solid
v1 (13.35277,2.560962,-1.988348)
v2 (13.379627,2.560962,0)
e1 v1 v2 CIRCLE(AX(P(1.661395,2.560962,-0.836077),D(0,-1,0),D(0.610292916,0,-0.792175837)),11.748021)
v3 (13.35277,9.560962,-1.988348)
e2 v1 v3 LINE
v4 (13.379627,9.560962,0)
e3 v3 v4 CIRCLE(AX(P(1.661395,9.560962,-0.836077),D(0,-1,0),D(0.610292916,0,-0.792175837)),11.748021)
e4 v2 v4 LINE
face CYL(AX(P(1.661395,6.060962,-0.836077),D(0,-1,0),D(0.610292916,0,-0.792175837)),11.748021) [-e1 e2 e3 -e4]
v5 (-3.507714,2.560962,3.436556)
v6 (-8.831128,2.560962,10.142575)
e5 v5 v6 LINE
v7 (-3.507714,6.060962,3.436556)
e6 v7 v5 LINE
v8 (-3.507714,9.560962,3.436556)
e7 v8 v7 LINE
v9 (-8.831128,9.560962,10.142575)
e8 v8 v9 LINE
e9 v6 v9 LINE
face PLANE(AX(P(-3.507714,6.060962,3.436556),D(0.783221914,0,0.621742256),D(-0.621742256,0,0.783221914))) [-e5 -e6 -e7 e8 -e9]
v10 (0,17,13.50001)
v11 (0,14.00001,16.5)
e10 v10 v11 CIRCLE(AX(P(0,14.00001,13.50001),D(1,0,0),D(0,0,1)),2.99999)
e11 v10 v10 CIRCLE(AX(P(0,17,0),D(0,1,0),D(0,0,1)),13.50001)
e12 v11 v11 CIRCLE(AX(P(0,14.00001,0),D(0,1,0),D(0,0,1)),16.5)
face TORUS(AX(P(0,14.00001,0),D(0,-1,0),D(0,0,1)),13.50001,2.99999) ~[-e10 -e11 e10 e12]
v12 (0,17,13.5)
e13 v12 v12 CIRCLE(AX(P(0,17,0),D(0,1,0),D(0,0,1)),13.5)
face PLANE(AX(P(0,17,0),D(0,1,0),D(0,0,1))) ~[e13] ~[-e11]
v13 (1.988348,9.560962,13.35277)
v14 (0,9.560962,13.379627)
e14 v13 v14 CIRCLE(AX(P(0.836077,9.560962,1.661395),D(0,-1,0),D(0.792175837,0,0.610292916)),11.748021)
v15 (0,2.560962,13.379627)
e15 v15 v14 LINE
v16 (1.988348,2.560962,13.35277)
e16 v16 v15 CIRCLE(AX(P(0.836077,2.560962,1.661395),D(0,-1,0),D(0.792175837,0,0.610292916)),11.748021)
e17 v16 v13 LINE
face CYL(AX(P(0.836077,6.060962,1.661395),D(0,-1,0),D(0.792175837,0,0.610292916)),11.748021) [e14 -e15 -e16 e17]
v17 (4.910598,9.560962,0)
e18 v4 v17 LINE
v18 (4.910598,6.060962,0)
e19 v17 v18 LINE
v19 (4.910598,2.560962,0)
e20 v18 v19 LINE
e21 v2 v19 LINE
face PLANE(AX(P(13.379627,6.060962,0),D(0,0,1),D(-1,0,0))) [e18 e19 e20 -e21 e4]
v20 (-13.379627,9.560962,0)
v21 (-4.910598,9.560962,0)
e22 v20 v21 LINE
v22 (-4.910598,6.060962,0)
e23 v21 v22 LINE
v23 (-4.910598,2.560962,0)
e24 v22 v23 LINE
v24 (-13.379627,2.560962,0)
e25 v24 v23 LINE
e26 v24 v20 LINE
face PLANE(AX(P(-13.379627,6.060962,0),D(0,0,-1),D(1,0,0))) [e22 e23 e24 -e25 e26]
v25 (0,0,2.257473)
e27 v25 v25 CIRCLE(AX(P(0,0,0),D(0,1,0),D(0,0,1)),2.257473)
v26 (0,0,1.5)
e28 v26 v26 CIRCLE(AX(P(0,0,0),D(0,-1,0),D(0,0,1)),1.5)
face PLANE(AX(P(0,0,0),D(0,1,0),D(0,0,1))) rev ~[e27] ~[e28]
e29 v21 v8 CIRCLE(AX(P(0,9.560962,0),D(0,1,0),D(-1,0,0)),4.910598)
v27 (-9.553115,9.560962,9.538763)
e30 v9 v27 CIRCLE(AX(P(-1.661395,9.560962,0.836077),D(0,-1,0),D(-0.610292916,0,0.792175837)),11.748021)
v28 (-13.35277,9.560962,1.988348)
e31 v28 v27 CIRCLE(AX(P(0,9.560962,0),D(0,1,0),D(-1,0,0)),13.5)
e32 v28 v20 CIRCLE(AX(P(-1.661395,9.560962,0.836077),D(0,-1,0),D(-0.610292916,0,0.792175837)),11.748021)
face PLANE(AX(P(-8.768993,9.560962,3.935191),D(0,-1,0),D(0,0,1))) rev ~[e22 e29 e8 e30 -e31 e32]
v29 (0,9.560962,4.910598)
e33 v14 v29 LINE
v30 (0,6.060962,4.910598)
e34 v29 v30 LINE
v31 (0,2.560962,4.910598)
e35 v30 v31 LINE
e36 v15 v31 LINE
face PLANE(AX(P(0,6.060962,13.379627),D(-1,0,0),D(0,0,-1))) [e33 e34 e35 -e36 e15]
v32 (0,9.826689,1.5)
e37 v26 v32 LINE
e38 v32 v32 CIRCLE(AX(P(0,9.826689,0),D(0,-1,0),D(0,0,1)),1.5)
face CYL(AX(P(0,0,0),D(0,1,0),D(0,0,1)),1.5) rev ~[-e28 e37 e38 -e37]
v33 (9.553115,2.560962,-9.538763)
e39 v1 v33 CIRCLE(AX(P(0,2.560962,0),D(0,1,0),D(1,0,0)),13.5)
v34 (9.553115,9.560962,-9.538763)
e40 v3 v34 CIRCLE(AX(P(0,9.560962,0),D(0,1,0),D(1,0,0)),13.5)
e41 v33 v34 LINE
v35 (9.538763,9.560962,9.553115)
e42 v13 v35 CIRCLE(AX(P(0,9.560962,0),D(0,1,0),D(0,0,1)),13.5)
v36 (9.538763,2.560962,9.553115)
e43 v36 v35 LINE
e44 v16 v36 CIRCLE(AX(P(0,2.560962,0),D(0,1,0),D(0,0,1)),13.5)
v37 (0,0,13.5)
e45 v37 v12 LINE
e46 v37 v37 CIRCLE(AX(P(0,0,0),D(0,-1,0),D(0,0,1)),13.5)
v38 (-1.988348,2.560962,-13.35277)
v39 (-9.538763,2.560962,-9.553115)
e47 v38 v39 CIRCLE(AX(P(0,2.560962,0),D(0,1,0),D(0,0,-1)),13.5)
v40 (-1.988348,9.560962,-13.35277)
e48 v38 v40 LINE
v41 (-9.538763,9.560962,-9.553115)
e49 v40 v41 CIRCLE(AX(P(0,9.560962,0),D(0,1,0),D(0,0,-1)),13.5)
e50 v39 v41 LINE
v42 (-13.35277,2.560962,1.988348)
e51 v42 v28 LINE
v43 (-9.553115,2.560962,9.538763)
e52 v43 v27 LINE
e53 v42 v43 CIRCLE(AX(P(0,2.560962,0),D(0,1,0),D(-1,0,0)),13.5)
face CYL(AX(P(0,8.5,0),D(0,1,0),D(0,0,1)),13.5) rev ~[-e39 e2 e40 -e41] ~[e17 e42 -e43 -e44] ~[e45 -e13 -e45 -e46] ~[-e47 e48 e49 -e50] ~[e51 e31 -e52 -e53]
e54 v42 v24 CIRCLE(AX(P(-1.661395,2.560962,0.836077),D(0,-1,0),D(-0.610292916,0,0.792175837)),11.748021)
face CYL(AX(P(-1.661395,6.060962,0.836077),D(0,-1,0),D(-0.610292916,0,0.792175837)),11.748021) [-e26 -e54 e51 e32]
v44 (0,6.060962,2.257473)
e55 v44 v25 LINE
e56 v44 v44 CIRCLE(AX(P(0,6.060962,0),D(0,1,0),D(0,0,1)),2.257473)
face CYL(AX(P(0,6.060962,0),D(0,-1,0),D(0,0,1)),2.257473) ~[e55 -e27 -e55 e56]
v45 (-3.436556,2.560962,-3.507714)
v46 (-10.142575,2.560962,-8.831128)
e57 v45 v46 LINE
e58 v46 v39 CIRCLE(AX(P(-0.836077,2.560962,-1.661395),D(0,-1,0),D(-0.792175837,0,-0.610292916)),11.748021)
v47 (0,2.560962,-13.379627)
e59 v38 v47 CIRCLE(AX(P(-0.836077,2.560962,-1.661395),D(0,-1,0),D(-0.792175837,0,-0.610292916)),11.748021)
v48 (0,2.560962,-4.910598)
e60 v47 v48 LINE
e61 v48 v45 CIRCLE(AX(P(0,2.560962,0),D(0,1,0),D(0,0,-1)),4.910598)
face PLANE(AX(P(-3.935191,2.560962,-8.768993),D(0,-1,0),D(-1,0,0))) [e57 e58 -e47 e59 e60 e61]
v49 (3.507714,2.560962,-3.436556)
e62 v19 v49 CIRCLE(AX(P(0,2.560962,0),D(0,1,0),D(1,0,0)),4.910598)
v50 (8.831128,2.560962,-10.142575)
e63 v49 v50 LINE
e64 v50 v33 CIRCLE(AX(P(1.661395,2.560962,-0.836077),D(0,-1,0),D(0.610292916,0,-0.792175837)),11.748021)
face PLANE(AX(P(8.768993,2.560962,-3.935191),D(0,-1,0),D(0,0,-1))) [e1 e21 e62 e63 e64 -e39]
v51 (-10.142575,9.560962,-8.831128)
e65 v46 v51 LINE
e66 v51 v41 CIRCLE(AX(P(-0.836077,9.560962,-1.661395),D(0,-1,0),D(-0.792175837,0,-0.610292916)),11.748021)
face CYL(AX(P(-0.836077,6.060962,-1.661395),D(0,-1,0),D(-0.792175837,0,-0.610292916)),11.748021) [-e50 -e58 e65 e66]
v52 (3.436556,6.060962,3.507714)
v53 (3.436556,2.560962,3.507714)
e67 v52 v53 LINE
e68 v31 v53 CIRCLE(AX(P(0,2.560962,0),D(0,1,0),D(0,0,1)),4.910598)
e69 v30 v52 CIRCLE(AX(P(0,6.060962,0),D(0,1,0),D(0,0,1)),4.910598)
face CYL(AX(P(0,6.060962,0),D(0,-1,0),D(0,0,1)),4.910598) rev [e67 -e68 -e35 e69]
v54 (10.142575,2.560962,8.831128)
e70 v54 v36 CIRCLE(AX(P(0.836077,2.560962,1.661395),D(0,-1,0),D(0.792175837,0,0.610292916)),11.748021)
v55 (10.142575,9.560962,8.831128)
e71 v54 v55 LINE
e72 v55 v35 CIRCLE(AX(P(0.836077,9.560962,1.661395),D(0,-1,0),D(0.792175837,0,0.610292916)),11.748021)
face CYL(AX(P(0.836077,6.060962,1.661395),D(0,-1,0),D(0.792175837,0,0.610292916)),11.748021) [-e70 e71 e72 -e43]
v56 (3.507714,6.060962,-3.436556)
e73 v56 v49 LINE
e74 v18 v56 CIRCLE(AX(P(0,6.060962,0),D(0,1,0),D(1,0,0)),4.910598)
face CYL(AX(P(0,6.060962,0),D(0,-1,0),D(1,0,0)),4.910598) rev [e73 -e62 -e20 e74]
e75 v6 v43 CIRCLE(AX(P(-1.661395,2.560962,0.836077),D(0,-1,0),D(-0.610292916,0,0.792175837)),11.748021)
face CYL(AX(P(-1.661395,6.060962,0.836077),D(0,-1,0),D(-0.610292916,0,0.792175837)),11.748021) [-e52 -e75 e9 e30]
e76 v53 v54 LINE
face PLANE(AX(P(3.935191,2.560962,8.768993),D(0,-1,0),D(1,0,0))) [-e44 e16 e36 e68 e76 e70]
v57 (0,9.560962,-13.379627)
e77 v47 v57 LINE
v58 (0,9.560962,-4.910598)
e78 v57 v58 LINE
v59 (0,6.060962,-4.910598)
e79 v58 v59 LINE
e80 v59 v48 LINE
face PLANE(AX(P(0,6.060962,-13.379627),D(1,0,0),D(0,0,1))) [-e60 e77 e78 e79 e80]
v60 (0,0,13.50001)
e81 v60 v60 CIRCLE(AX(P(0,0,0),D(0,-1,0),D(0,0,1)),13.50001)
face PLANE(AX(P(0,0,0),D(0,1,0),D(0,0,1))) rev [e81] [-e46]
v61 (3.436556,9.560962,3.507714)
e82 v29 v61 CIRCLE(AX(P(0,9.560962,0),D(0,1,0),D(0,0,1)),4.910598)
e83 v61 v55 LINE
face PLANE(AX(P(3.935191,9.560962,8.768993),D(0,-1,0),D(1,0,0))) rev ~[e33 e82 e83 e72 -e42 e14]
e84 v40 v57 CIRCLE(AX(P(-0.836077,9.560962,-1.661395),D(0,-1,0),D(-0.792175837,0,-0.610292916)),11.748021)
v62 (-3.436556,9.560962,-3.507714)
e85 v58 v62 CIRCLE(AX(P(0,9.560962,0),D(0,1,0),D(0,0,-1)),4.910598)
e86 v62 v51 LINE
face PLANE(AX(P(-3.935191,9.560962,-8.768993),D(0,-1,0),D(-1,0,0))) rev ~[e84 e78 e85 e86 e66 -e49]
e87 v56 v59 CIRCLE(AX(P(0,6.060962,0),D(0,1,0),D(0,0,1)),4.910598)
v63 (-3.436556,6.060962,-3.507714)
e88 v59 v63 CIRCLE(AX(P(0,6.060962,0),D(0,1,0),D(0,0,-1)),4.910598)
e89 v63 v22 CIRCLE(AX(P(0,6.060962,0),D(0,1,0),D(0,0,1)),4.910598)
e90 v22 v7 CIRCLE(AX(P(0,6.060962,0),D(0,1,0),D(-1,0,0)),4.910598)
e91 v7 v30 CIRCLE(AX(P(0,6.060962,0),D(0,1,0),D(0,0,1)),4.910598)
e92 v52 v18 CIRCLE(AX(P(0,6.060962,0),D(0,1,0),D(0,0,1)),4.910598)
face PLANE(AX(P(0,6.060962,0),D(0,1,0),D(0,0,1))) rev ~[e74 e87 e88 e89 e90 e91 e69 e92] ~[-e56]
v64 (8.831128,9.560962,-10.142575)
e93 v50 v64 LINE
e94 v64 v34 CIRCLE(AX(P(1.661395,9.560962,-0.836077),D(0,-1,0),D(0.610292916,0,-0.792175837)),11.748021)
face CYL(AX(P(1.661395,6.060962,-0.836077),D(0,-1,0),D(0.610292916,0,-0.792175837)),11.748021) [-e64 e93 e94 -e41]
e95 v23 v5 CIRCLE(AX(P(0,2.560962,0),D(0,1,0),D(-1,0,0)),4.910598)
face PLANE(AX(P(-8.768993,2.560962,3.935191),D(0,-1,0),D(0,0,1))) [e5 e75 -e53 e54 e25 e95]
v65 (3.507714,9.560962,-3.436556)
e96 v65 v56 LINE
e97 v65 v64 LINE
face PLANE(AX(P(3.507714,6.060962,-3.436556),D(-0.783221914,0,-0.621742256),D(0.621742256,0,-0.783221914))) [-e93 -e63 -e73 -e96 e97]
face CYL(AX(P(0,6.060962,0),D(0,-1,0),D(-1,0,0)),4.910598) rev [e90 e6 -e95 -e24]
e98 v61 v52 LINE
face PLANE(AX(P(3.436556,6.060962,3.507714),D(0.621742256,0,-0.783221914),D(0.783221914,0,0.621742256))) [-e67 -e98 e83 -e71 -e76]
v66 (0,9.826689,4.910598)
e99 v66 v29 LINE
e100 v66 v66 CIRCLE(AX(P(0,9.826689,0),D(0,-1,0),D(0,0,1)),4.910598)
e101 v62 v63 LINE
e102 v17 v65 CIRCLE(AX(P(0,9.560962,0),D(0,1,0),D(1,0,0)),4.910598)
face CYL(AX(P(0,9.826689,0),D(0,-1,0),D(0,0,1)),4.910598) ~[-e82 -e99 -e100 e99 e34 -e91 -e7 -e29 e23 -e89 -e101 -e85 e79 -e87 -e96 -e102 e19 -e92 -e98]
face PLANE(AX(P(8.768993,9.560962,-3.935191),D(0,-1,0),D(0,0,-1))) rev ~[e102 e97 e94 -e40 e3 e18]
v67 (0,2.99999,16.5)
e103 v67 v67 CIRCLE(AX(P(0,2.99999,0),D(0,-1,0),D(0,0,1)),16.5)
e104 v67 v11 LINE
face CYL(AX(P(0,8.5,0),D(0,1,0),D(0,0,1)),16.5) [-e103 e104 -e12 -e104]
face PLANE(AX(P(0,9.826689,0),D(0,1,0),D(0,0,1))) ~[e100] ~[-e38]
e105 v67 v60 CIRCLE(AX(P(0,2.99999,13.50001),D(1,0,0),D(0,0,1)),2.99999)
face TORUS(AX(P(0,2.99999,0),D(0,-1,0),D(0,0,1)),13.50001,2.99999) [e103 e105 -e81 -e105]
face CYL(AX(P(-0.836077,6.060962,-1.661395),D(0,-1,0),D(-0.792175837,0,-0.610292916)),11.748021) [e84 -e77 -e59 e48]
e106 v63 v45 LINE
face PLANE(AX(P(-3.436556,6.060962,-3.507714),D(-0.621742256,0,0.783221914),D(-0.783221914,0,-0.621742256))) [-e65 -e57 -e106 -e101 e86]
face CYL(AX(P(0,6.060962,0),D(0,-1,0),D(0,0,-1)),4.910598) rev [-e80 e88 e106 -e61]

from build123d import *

# Parameters (mm, degrees)
F0_W     = 17
F0_H     = 3
F3_DEPTH = 3.5
F4_COUNT = 4
F5_R     = 2.99999


# Not quite as in the source:
# - a fillet or chamfer is up to 0.001 mm smaller than in the source, because OpenCascade refuses the exact size


with BuildPart() as f1:
    # F0 (on Right) → F1 (revolve)
    with BuildSketch(Plane.YZ):
        with Locations((8.5, 15)):
            Rectangle(F0_W, F0_H)
    revolve(axis=Axis((0, 4.8521989956, 0), (0, 1, 0)))



with BuildPart() as f1b:
    # F0 (on Right) → F1, piece 2 (revolve)
    with BuildSketch(Plane.YZ):
        Polygon((0, 2.2574728355), (0, 1.5), (9.8266890272, 1.5), (9.8266890272, 4.9105980434), (6.0609620996, 4.9105980434), (6.0609620996, 2.2574728355), align=None)
    revolve(axis=Axis((0, 4.8521989956, 0), (0, 1, 0)))


with BuildPart() as f1_1:
    add(f1.part)

    add(f1b.part)  # F3 merges F1b
    # F2 (on face) → F3 (join, symmetric)
    with BuildSketch(Plane.XZ.offset(-6.0609620996)):
        with BuildLine():
            Line((0, 13.3796269074), (0, 4.9105980434))
            ThreePointArc((0, 4.9105980434), (1.8559366755, 4.5463691227), (3.4365562486, 3.5077135421))
            Line((3.4365562486, 3.5077135421), (10.1425750181, 8.8311284781))
            ThreePointArc((10.1425750181, 8.8311284781), (5.6432817311, 12.3808523131), (0, 13.3796269074))
        make_face()
    extrude(amount=F3_DEPTH, both=True)

    # F4: F1 ×4 about axis
    f4_axis = Axis((0, 9.8266890272, 0), (0, 1, 0))


with BuildPart() as f1_2:
    add(f1_1.part)
    for i in range(1, F4_COUNT):
        add(f1_1.part.rotate(f4_axis, i * 360 / F4_COUNT))

    # F5 (radius 3 in the source; OpenCascade refuses exactly that, so slightly less here)
    f5_edges = [f1_2.edges().sort_by_distance(p)[0] for p in [
        (0, 0, -16.5),
        (0, 17, -16.5),
    ]]
    fillet(f5_edges, radius=F5_R)


solid = f1_2.part
